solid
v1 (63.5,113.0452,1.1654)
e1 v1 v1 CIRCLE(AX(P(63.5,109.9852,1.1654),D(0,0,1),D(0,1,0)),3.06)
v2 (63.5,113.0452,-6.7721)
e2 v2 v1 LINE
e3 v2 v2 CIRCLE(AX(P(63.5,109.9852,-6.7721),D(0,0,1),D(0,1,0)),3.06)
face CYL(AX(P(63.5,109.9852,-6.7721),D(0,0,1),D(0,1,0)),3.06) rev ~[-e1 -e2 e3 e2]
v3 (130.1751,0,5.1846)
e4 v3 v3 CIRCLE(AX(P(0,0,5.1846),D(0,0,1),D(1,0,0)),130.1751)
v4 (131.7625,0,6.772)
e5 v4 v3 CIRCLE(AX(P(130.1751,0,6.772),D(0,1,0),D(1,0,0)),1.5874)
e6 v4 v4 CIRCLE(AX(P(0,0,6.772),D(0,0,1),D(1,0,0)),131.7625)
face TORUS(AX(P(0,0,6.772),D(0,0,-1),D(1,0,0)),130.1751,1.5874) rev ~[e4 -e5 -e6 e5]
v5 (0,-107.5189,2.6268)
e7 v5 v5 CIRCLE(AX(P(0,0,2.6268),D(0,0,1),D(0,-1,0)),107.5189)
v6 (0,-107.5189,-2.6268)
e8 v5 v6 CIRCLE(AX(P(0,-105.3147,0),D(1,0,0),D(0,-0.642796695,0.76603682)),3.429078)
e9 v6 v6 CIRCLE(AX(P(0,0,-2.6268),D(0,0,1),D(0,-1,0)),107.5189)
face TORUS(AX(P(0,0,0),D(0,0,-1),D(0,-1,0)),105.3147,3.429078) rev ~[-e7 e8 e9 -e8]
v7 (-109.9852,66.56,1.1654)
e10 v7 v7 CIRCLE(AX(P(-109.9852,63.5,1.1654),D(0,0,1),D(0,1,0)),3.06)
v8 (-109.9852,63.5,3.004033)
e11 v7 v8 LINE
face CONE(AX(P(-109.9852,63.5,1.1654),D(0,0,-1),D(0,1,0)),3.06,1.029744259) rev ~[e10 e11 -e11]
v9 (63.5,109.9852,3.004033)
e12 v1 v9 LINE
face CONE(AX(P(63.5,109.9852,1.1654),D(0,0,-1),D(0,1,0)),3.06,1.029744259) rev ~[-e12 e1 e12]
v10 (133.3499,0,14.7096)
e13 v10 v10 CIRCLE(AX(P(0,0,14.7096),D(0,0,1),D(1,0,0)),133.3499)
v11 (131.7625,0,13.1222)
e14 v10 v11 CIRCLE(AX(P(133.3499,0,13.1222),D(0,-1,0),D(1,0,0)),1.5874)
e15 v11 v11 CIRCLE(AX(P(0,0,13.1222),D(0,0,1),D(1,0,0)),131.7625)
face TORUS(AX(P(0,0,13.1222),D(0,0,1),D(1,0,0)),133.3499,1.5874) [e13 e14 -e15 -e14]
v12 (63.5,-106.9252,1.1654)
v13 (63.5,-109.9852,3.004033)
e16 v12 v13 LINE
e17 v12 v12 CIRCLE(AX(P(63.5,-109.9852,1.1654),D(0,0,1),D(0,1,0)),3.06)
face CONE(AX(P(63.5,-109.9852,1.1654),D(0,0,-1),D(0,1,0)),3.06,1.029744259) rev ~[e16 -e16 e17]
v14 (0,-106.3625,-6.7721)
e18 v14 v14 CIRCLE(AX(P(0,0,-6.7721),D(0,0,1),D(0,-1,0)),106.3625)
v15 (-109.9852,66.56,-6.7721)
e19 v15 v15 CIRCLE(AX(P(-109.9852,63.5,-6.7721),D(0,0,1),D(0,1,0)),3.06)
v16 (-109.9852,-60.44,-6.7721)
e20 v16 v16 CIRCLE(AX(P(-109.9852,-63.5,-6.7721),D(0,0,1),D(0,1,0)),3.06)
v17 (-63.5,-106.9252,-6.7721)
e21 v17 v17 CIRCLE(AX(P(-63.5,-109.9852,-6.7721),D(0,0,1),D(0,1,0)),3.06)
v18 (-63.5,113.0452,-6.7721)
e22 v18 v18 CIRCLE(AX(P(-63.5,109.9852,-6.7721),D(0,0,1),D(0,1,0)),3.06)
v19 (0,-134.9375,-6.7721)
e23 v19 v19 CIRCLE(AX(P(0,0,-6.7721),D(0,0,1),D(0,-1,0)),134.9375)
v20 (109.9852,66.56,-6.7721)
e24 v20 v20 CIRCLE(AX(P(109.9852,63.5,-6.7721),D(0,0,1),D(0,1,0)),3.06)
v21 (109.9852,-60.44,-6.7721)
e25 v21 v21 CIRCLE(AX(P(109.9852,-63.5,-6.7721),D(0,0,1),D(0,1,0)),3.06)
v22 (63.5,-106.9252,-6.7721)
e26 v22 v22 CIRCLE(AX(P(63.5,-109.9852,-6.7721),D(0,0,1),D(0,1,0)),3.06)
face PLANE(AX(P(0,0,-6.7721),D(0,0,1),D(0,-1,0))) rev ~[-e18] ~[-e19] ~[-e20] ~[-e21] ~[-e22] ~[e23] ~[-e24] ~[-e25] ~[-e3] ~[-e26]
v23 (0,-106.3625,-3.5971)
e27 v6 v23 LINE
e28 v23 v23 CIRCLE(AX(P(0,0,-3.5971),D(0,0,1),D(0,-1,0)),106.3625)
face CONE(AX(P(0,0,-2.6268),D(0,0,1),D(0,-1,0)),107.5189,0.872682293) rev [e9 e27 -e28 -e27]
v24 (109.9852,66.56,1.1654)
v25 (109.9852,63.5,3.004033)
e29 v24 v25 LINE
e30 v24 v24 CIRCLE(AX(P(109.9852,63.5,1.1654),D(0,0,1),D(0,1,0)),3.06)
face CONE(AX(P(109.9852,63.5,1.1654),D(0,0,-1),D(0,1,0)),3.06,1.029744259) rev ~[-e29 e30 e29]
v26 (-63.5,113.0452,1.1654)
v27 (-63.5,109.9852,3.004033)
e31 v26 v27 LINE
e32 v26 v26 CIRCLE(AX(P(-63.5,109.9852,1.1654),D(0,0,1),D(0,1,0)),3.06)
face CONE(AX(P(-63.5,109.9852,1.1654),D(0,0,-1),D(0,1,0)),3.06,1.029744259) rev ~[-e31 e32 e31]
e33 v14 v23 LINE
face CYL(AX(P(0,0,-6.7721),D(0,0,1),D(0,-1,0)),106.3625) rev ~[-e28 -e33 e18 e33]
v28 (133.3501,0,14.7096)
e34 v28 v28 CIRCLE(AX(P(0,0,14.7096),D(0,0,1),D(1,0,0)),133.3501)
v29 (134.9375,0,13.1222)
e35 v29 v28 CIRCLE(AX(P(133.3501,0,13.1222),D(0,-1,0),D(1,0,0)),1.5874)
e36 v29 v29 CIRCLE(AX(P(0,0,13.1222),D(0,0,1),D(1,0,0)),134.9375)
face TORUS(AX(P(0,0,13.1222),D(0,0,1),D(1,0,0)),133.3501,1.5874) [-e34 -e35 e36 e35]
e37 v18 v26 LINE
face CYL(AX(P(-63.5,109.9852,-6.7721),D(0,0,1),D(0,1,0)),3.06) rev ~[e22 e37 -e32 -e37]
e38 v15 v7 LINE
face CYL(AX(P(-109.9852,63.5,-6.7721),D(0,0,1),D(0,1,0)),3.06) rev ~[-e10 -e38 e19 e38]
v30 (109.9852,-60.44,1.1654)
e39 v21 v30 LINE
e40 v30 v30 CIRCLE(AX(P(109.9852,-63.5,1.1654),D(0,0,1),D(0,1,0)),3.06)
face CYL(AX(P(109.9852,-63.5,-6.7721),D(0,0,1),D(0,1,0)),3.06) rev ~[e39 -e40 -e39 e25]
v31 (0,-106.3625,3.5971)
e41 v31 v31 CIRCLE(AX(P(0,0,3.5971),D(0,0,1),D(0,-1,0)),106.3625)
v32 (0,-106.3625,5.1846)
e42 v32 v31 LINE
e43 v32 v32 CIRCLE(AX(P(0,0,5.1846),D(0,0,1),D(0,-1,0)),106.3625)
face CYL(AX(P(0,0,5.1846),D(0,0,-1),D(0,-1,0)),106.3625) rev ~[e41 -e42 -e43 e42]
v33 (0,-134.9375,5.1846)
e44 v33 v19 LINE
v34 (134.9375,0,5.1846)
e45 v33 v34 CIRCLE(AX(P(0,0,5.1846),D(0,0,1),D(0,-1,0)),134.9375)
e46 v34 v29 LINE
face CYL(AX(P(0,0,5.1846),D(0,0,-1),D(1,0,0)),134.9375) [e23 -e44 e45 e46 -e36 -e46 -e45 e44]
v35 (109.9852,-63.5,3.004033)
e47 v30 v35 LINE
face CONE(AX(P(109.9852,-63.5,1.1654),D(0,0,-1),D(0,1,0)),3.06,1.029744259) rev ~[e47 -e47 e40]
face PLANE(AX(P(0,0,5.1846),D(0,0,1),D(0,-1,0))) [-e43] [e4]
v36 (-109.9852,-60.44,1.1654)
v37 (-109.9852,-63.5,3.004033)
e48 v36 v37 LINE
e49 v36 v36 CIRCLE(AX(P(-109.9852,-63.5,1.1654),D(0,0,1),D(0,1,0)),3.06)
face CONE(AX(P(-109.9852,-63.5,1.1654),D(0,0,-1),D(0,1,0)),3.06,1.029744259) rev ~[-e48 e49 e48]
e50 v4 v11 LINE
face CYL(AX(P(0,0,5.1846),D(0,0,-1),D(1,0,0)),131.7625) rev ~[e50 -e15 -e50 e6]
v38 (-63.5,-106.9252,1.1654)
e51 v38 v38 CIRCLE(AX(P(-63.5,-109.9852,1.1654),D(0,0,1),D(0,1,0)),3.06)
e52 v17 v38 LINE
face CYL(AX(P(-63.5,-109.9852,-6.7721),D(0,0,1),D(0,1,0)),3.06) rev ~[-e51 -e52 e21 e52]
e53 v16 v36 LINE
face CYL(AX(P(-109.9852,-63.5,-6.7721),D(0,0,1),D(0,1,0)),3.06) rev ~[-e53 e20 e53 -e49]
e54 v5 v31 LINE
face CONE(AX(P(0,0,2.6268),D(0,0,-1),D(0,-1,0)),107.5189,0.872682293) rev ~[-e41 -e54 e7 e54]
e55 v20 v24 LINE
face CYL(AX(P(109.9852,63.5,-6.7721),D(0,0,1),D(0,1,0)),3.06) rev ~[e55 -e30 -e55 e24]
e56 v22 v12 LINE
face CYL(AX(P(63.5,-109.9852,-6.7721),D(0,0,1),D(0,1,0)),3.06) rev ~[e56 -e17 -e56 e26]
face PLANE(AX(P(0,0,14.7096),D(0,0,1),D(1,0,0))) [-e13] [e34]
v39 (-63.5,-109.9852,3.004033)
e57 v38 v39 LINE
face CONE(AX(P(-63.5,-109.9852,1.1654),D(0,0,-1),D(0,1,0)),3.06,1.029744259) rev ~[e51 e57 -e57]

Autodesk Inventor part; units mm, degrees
ref_plane "YZ Plane" through (0, 0, 0) normal (1, 0, 0) x (0, 1, 0)
ref_plane "XZ Plane" through (0, 0, 0) normal (0, 1, 0) x (-1, 0, 0)
ref_plane "XY Plane" through (0, 0, 0) normal (0, 0, 1) x (1, 0, 0)
sketch "Sketch1" plane through (0, 0, 0) normal (1, 0, 0) x (0, 1, 0)
  arc A0 (-107.5189, 2.6268) -> (-107.5189, -2.6268) centre (-105.3147, 0) ccw
  line L0 (-105.5687, 3.175) -> (-105.5687, -3.175) construction
  line L1 (-107.5189, 2.6268) -> (-107.5189, 4.635) construction
  line L2 (-106.3625, 5.1846) -> (-106.3625, 3.5971)
  line L3 (-107.5189, 2.6268) -> (-106.3625, 3.5971)
  line L4 (-107.5189, -2.6268) -> (-106.3625, -3.5971)
  line L5 (-134.9375, 5.1846) -> (-134.9375, -6.7721)
  line L6 (-134.9375, 5.1846) -> (-106.3625, 5.1846)
  line L7 (-134.9375, -6.7721) -> (-106.3625, -6.7721)
  line L8 (-106.3625, -6.7721) -> (-106.3625, -3.5971)
  circle A1 centre (-105.5687, 0) radius 3.175 construction
  line L9 (-35.1032, 0) -> (87.3968, 0) construction
  line L10 (-104.775, 5.1846) -> (-104.775, 3.5971) construction
  line L11 (-104.775, -6.7721) -> (-104.775, -3.5971) construction
  line L12 (-103.6186, 2.6268) -> (-104.775, 3.5971) construction
  line L13 (-103.6186, -2.6268) -> (-104.775, -3.5971) construction
  arc A2 (-103.6186, -2.6268) -> (-103.6186, 2.6268) centre (-105.8227, 0) ccw construction
  line L14 (-79.375, 5.1846) -> (-79.375, -6.7721) construction
  line L15 (0, -7.2584) -> (0, 7.2584) construction
  line L16 (-79.375, -6.7721) -> (-104.775, -6.7721) construction
  line L17 (-79.375, 5.1846) -> (-104.775, 5.1846) construction
  line L18 (-104.775, 5.1846) -> (-104.775, 8.3596) construction
  line L19 (-104.775, 8.3596) -> (-79.375, 8.3596) construction
  line L20 (-79.375, 8.3596) -> (-79.375, 5.1846) construction
  line L21 (-90.4875, 22.7342) -> (-90.4875, 8.3596) construction
  point P0 (0, 0)
  point P1 (0, 0)
  point P2 (-108.7437, 0)
  point P3 (-134.9375, -0.7938)
  point P4 (-19.1031, 0)
  point P5 (0, 7.2584)
  point P6 (0, 0)
  point P7 (-119.9381, 21.0485)
  dimension "d0" = 6.35
  dimension "d1" = 3.429
  dimension "d2" = 50
  dimension "d3" = 3.175
  dimension "d4" = 1.5875
  dimension "d5" = 158.75
  dimension "d6" = 3.175
  dimension "d7" = 25.4
  dimension "d8" = 28.575
  dimension "d9" = 180.975
  dimension "d31" = 1.5875
revolve "Revolution1" add sketch "Sketch1" angle 360 about axis through (0, 0, -7.2584) along (0, 0, 1)
sketch "Sketch2" plane through (0, 0, -6.7721) normal (0, 0, 1) x (1, 0, 0)
  point P0 (0, 0)
  point P1 (-127, 0)
  point P2 (-109.9852, -63.5)
  point P3 (-63.5, -109.9852)
  point P4 (0, -127)
  point P5 (63.5, -109.9852)
  point P6 (109.9852, -63.5)
  point P7 (127, 0)
  point P8 (109.9852, 63.5)
  point P9 (63.5, 109.9852)
  point P10 (0, 127)
  point P11 (-63.5, 109.9852)
  point P12 (-109.9852, 63.5)
  dimension "d11" = 127
  dimension "d14" = 360
hole "Hole1" at (-109.9852, -63.5, -6.7721) at (-63.5, -109.9852, -6.7721) at (63.5, -109.9852, -6.7721) at (109.9852, -63.5, -6.7721) at (109.9852, 63.5, -6.7721) at (63.5, 109.9852, -6.7721) at (-63.5, 109.9852, -6.7721) at (-109.9852, 63.5, -6.7721) direction (0, 0, 1) diameter 6.12 depth 7.9375 tip angle 118
sketch "Sketch3" plane through (0, 0, 5.1846) normal (0, 0, 1) x (1, 0, 0)
  circle A0 centre (0, 0) radius 134.9375
  circle A1 centre (0, 0) radius 131.7625
  circle A2 centre (0, 0) radius 134.9375 projected
  dimension "d27" = 3.175
extrude "Extrusion1" add sketch "Sketch3" along normal blind 9.525
fillet "Fillet2" radius 1.5875 3 edges at (-131.7625, 0, 14.7096) (-134.9375, 0, 14.7096) (-131.7625, 0, 5.1846)
properties part number "3DPRINT,TURRET,BEARING,OUTER" material "Nylon 6/6"
